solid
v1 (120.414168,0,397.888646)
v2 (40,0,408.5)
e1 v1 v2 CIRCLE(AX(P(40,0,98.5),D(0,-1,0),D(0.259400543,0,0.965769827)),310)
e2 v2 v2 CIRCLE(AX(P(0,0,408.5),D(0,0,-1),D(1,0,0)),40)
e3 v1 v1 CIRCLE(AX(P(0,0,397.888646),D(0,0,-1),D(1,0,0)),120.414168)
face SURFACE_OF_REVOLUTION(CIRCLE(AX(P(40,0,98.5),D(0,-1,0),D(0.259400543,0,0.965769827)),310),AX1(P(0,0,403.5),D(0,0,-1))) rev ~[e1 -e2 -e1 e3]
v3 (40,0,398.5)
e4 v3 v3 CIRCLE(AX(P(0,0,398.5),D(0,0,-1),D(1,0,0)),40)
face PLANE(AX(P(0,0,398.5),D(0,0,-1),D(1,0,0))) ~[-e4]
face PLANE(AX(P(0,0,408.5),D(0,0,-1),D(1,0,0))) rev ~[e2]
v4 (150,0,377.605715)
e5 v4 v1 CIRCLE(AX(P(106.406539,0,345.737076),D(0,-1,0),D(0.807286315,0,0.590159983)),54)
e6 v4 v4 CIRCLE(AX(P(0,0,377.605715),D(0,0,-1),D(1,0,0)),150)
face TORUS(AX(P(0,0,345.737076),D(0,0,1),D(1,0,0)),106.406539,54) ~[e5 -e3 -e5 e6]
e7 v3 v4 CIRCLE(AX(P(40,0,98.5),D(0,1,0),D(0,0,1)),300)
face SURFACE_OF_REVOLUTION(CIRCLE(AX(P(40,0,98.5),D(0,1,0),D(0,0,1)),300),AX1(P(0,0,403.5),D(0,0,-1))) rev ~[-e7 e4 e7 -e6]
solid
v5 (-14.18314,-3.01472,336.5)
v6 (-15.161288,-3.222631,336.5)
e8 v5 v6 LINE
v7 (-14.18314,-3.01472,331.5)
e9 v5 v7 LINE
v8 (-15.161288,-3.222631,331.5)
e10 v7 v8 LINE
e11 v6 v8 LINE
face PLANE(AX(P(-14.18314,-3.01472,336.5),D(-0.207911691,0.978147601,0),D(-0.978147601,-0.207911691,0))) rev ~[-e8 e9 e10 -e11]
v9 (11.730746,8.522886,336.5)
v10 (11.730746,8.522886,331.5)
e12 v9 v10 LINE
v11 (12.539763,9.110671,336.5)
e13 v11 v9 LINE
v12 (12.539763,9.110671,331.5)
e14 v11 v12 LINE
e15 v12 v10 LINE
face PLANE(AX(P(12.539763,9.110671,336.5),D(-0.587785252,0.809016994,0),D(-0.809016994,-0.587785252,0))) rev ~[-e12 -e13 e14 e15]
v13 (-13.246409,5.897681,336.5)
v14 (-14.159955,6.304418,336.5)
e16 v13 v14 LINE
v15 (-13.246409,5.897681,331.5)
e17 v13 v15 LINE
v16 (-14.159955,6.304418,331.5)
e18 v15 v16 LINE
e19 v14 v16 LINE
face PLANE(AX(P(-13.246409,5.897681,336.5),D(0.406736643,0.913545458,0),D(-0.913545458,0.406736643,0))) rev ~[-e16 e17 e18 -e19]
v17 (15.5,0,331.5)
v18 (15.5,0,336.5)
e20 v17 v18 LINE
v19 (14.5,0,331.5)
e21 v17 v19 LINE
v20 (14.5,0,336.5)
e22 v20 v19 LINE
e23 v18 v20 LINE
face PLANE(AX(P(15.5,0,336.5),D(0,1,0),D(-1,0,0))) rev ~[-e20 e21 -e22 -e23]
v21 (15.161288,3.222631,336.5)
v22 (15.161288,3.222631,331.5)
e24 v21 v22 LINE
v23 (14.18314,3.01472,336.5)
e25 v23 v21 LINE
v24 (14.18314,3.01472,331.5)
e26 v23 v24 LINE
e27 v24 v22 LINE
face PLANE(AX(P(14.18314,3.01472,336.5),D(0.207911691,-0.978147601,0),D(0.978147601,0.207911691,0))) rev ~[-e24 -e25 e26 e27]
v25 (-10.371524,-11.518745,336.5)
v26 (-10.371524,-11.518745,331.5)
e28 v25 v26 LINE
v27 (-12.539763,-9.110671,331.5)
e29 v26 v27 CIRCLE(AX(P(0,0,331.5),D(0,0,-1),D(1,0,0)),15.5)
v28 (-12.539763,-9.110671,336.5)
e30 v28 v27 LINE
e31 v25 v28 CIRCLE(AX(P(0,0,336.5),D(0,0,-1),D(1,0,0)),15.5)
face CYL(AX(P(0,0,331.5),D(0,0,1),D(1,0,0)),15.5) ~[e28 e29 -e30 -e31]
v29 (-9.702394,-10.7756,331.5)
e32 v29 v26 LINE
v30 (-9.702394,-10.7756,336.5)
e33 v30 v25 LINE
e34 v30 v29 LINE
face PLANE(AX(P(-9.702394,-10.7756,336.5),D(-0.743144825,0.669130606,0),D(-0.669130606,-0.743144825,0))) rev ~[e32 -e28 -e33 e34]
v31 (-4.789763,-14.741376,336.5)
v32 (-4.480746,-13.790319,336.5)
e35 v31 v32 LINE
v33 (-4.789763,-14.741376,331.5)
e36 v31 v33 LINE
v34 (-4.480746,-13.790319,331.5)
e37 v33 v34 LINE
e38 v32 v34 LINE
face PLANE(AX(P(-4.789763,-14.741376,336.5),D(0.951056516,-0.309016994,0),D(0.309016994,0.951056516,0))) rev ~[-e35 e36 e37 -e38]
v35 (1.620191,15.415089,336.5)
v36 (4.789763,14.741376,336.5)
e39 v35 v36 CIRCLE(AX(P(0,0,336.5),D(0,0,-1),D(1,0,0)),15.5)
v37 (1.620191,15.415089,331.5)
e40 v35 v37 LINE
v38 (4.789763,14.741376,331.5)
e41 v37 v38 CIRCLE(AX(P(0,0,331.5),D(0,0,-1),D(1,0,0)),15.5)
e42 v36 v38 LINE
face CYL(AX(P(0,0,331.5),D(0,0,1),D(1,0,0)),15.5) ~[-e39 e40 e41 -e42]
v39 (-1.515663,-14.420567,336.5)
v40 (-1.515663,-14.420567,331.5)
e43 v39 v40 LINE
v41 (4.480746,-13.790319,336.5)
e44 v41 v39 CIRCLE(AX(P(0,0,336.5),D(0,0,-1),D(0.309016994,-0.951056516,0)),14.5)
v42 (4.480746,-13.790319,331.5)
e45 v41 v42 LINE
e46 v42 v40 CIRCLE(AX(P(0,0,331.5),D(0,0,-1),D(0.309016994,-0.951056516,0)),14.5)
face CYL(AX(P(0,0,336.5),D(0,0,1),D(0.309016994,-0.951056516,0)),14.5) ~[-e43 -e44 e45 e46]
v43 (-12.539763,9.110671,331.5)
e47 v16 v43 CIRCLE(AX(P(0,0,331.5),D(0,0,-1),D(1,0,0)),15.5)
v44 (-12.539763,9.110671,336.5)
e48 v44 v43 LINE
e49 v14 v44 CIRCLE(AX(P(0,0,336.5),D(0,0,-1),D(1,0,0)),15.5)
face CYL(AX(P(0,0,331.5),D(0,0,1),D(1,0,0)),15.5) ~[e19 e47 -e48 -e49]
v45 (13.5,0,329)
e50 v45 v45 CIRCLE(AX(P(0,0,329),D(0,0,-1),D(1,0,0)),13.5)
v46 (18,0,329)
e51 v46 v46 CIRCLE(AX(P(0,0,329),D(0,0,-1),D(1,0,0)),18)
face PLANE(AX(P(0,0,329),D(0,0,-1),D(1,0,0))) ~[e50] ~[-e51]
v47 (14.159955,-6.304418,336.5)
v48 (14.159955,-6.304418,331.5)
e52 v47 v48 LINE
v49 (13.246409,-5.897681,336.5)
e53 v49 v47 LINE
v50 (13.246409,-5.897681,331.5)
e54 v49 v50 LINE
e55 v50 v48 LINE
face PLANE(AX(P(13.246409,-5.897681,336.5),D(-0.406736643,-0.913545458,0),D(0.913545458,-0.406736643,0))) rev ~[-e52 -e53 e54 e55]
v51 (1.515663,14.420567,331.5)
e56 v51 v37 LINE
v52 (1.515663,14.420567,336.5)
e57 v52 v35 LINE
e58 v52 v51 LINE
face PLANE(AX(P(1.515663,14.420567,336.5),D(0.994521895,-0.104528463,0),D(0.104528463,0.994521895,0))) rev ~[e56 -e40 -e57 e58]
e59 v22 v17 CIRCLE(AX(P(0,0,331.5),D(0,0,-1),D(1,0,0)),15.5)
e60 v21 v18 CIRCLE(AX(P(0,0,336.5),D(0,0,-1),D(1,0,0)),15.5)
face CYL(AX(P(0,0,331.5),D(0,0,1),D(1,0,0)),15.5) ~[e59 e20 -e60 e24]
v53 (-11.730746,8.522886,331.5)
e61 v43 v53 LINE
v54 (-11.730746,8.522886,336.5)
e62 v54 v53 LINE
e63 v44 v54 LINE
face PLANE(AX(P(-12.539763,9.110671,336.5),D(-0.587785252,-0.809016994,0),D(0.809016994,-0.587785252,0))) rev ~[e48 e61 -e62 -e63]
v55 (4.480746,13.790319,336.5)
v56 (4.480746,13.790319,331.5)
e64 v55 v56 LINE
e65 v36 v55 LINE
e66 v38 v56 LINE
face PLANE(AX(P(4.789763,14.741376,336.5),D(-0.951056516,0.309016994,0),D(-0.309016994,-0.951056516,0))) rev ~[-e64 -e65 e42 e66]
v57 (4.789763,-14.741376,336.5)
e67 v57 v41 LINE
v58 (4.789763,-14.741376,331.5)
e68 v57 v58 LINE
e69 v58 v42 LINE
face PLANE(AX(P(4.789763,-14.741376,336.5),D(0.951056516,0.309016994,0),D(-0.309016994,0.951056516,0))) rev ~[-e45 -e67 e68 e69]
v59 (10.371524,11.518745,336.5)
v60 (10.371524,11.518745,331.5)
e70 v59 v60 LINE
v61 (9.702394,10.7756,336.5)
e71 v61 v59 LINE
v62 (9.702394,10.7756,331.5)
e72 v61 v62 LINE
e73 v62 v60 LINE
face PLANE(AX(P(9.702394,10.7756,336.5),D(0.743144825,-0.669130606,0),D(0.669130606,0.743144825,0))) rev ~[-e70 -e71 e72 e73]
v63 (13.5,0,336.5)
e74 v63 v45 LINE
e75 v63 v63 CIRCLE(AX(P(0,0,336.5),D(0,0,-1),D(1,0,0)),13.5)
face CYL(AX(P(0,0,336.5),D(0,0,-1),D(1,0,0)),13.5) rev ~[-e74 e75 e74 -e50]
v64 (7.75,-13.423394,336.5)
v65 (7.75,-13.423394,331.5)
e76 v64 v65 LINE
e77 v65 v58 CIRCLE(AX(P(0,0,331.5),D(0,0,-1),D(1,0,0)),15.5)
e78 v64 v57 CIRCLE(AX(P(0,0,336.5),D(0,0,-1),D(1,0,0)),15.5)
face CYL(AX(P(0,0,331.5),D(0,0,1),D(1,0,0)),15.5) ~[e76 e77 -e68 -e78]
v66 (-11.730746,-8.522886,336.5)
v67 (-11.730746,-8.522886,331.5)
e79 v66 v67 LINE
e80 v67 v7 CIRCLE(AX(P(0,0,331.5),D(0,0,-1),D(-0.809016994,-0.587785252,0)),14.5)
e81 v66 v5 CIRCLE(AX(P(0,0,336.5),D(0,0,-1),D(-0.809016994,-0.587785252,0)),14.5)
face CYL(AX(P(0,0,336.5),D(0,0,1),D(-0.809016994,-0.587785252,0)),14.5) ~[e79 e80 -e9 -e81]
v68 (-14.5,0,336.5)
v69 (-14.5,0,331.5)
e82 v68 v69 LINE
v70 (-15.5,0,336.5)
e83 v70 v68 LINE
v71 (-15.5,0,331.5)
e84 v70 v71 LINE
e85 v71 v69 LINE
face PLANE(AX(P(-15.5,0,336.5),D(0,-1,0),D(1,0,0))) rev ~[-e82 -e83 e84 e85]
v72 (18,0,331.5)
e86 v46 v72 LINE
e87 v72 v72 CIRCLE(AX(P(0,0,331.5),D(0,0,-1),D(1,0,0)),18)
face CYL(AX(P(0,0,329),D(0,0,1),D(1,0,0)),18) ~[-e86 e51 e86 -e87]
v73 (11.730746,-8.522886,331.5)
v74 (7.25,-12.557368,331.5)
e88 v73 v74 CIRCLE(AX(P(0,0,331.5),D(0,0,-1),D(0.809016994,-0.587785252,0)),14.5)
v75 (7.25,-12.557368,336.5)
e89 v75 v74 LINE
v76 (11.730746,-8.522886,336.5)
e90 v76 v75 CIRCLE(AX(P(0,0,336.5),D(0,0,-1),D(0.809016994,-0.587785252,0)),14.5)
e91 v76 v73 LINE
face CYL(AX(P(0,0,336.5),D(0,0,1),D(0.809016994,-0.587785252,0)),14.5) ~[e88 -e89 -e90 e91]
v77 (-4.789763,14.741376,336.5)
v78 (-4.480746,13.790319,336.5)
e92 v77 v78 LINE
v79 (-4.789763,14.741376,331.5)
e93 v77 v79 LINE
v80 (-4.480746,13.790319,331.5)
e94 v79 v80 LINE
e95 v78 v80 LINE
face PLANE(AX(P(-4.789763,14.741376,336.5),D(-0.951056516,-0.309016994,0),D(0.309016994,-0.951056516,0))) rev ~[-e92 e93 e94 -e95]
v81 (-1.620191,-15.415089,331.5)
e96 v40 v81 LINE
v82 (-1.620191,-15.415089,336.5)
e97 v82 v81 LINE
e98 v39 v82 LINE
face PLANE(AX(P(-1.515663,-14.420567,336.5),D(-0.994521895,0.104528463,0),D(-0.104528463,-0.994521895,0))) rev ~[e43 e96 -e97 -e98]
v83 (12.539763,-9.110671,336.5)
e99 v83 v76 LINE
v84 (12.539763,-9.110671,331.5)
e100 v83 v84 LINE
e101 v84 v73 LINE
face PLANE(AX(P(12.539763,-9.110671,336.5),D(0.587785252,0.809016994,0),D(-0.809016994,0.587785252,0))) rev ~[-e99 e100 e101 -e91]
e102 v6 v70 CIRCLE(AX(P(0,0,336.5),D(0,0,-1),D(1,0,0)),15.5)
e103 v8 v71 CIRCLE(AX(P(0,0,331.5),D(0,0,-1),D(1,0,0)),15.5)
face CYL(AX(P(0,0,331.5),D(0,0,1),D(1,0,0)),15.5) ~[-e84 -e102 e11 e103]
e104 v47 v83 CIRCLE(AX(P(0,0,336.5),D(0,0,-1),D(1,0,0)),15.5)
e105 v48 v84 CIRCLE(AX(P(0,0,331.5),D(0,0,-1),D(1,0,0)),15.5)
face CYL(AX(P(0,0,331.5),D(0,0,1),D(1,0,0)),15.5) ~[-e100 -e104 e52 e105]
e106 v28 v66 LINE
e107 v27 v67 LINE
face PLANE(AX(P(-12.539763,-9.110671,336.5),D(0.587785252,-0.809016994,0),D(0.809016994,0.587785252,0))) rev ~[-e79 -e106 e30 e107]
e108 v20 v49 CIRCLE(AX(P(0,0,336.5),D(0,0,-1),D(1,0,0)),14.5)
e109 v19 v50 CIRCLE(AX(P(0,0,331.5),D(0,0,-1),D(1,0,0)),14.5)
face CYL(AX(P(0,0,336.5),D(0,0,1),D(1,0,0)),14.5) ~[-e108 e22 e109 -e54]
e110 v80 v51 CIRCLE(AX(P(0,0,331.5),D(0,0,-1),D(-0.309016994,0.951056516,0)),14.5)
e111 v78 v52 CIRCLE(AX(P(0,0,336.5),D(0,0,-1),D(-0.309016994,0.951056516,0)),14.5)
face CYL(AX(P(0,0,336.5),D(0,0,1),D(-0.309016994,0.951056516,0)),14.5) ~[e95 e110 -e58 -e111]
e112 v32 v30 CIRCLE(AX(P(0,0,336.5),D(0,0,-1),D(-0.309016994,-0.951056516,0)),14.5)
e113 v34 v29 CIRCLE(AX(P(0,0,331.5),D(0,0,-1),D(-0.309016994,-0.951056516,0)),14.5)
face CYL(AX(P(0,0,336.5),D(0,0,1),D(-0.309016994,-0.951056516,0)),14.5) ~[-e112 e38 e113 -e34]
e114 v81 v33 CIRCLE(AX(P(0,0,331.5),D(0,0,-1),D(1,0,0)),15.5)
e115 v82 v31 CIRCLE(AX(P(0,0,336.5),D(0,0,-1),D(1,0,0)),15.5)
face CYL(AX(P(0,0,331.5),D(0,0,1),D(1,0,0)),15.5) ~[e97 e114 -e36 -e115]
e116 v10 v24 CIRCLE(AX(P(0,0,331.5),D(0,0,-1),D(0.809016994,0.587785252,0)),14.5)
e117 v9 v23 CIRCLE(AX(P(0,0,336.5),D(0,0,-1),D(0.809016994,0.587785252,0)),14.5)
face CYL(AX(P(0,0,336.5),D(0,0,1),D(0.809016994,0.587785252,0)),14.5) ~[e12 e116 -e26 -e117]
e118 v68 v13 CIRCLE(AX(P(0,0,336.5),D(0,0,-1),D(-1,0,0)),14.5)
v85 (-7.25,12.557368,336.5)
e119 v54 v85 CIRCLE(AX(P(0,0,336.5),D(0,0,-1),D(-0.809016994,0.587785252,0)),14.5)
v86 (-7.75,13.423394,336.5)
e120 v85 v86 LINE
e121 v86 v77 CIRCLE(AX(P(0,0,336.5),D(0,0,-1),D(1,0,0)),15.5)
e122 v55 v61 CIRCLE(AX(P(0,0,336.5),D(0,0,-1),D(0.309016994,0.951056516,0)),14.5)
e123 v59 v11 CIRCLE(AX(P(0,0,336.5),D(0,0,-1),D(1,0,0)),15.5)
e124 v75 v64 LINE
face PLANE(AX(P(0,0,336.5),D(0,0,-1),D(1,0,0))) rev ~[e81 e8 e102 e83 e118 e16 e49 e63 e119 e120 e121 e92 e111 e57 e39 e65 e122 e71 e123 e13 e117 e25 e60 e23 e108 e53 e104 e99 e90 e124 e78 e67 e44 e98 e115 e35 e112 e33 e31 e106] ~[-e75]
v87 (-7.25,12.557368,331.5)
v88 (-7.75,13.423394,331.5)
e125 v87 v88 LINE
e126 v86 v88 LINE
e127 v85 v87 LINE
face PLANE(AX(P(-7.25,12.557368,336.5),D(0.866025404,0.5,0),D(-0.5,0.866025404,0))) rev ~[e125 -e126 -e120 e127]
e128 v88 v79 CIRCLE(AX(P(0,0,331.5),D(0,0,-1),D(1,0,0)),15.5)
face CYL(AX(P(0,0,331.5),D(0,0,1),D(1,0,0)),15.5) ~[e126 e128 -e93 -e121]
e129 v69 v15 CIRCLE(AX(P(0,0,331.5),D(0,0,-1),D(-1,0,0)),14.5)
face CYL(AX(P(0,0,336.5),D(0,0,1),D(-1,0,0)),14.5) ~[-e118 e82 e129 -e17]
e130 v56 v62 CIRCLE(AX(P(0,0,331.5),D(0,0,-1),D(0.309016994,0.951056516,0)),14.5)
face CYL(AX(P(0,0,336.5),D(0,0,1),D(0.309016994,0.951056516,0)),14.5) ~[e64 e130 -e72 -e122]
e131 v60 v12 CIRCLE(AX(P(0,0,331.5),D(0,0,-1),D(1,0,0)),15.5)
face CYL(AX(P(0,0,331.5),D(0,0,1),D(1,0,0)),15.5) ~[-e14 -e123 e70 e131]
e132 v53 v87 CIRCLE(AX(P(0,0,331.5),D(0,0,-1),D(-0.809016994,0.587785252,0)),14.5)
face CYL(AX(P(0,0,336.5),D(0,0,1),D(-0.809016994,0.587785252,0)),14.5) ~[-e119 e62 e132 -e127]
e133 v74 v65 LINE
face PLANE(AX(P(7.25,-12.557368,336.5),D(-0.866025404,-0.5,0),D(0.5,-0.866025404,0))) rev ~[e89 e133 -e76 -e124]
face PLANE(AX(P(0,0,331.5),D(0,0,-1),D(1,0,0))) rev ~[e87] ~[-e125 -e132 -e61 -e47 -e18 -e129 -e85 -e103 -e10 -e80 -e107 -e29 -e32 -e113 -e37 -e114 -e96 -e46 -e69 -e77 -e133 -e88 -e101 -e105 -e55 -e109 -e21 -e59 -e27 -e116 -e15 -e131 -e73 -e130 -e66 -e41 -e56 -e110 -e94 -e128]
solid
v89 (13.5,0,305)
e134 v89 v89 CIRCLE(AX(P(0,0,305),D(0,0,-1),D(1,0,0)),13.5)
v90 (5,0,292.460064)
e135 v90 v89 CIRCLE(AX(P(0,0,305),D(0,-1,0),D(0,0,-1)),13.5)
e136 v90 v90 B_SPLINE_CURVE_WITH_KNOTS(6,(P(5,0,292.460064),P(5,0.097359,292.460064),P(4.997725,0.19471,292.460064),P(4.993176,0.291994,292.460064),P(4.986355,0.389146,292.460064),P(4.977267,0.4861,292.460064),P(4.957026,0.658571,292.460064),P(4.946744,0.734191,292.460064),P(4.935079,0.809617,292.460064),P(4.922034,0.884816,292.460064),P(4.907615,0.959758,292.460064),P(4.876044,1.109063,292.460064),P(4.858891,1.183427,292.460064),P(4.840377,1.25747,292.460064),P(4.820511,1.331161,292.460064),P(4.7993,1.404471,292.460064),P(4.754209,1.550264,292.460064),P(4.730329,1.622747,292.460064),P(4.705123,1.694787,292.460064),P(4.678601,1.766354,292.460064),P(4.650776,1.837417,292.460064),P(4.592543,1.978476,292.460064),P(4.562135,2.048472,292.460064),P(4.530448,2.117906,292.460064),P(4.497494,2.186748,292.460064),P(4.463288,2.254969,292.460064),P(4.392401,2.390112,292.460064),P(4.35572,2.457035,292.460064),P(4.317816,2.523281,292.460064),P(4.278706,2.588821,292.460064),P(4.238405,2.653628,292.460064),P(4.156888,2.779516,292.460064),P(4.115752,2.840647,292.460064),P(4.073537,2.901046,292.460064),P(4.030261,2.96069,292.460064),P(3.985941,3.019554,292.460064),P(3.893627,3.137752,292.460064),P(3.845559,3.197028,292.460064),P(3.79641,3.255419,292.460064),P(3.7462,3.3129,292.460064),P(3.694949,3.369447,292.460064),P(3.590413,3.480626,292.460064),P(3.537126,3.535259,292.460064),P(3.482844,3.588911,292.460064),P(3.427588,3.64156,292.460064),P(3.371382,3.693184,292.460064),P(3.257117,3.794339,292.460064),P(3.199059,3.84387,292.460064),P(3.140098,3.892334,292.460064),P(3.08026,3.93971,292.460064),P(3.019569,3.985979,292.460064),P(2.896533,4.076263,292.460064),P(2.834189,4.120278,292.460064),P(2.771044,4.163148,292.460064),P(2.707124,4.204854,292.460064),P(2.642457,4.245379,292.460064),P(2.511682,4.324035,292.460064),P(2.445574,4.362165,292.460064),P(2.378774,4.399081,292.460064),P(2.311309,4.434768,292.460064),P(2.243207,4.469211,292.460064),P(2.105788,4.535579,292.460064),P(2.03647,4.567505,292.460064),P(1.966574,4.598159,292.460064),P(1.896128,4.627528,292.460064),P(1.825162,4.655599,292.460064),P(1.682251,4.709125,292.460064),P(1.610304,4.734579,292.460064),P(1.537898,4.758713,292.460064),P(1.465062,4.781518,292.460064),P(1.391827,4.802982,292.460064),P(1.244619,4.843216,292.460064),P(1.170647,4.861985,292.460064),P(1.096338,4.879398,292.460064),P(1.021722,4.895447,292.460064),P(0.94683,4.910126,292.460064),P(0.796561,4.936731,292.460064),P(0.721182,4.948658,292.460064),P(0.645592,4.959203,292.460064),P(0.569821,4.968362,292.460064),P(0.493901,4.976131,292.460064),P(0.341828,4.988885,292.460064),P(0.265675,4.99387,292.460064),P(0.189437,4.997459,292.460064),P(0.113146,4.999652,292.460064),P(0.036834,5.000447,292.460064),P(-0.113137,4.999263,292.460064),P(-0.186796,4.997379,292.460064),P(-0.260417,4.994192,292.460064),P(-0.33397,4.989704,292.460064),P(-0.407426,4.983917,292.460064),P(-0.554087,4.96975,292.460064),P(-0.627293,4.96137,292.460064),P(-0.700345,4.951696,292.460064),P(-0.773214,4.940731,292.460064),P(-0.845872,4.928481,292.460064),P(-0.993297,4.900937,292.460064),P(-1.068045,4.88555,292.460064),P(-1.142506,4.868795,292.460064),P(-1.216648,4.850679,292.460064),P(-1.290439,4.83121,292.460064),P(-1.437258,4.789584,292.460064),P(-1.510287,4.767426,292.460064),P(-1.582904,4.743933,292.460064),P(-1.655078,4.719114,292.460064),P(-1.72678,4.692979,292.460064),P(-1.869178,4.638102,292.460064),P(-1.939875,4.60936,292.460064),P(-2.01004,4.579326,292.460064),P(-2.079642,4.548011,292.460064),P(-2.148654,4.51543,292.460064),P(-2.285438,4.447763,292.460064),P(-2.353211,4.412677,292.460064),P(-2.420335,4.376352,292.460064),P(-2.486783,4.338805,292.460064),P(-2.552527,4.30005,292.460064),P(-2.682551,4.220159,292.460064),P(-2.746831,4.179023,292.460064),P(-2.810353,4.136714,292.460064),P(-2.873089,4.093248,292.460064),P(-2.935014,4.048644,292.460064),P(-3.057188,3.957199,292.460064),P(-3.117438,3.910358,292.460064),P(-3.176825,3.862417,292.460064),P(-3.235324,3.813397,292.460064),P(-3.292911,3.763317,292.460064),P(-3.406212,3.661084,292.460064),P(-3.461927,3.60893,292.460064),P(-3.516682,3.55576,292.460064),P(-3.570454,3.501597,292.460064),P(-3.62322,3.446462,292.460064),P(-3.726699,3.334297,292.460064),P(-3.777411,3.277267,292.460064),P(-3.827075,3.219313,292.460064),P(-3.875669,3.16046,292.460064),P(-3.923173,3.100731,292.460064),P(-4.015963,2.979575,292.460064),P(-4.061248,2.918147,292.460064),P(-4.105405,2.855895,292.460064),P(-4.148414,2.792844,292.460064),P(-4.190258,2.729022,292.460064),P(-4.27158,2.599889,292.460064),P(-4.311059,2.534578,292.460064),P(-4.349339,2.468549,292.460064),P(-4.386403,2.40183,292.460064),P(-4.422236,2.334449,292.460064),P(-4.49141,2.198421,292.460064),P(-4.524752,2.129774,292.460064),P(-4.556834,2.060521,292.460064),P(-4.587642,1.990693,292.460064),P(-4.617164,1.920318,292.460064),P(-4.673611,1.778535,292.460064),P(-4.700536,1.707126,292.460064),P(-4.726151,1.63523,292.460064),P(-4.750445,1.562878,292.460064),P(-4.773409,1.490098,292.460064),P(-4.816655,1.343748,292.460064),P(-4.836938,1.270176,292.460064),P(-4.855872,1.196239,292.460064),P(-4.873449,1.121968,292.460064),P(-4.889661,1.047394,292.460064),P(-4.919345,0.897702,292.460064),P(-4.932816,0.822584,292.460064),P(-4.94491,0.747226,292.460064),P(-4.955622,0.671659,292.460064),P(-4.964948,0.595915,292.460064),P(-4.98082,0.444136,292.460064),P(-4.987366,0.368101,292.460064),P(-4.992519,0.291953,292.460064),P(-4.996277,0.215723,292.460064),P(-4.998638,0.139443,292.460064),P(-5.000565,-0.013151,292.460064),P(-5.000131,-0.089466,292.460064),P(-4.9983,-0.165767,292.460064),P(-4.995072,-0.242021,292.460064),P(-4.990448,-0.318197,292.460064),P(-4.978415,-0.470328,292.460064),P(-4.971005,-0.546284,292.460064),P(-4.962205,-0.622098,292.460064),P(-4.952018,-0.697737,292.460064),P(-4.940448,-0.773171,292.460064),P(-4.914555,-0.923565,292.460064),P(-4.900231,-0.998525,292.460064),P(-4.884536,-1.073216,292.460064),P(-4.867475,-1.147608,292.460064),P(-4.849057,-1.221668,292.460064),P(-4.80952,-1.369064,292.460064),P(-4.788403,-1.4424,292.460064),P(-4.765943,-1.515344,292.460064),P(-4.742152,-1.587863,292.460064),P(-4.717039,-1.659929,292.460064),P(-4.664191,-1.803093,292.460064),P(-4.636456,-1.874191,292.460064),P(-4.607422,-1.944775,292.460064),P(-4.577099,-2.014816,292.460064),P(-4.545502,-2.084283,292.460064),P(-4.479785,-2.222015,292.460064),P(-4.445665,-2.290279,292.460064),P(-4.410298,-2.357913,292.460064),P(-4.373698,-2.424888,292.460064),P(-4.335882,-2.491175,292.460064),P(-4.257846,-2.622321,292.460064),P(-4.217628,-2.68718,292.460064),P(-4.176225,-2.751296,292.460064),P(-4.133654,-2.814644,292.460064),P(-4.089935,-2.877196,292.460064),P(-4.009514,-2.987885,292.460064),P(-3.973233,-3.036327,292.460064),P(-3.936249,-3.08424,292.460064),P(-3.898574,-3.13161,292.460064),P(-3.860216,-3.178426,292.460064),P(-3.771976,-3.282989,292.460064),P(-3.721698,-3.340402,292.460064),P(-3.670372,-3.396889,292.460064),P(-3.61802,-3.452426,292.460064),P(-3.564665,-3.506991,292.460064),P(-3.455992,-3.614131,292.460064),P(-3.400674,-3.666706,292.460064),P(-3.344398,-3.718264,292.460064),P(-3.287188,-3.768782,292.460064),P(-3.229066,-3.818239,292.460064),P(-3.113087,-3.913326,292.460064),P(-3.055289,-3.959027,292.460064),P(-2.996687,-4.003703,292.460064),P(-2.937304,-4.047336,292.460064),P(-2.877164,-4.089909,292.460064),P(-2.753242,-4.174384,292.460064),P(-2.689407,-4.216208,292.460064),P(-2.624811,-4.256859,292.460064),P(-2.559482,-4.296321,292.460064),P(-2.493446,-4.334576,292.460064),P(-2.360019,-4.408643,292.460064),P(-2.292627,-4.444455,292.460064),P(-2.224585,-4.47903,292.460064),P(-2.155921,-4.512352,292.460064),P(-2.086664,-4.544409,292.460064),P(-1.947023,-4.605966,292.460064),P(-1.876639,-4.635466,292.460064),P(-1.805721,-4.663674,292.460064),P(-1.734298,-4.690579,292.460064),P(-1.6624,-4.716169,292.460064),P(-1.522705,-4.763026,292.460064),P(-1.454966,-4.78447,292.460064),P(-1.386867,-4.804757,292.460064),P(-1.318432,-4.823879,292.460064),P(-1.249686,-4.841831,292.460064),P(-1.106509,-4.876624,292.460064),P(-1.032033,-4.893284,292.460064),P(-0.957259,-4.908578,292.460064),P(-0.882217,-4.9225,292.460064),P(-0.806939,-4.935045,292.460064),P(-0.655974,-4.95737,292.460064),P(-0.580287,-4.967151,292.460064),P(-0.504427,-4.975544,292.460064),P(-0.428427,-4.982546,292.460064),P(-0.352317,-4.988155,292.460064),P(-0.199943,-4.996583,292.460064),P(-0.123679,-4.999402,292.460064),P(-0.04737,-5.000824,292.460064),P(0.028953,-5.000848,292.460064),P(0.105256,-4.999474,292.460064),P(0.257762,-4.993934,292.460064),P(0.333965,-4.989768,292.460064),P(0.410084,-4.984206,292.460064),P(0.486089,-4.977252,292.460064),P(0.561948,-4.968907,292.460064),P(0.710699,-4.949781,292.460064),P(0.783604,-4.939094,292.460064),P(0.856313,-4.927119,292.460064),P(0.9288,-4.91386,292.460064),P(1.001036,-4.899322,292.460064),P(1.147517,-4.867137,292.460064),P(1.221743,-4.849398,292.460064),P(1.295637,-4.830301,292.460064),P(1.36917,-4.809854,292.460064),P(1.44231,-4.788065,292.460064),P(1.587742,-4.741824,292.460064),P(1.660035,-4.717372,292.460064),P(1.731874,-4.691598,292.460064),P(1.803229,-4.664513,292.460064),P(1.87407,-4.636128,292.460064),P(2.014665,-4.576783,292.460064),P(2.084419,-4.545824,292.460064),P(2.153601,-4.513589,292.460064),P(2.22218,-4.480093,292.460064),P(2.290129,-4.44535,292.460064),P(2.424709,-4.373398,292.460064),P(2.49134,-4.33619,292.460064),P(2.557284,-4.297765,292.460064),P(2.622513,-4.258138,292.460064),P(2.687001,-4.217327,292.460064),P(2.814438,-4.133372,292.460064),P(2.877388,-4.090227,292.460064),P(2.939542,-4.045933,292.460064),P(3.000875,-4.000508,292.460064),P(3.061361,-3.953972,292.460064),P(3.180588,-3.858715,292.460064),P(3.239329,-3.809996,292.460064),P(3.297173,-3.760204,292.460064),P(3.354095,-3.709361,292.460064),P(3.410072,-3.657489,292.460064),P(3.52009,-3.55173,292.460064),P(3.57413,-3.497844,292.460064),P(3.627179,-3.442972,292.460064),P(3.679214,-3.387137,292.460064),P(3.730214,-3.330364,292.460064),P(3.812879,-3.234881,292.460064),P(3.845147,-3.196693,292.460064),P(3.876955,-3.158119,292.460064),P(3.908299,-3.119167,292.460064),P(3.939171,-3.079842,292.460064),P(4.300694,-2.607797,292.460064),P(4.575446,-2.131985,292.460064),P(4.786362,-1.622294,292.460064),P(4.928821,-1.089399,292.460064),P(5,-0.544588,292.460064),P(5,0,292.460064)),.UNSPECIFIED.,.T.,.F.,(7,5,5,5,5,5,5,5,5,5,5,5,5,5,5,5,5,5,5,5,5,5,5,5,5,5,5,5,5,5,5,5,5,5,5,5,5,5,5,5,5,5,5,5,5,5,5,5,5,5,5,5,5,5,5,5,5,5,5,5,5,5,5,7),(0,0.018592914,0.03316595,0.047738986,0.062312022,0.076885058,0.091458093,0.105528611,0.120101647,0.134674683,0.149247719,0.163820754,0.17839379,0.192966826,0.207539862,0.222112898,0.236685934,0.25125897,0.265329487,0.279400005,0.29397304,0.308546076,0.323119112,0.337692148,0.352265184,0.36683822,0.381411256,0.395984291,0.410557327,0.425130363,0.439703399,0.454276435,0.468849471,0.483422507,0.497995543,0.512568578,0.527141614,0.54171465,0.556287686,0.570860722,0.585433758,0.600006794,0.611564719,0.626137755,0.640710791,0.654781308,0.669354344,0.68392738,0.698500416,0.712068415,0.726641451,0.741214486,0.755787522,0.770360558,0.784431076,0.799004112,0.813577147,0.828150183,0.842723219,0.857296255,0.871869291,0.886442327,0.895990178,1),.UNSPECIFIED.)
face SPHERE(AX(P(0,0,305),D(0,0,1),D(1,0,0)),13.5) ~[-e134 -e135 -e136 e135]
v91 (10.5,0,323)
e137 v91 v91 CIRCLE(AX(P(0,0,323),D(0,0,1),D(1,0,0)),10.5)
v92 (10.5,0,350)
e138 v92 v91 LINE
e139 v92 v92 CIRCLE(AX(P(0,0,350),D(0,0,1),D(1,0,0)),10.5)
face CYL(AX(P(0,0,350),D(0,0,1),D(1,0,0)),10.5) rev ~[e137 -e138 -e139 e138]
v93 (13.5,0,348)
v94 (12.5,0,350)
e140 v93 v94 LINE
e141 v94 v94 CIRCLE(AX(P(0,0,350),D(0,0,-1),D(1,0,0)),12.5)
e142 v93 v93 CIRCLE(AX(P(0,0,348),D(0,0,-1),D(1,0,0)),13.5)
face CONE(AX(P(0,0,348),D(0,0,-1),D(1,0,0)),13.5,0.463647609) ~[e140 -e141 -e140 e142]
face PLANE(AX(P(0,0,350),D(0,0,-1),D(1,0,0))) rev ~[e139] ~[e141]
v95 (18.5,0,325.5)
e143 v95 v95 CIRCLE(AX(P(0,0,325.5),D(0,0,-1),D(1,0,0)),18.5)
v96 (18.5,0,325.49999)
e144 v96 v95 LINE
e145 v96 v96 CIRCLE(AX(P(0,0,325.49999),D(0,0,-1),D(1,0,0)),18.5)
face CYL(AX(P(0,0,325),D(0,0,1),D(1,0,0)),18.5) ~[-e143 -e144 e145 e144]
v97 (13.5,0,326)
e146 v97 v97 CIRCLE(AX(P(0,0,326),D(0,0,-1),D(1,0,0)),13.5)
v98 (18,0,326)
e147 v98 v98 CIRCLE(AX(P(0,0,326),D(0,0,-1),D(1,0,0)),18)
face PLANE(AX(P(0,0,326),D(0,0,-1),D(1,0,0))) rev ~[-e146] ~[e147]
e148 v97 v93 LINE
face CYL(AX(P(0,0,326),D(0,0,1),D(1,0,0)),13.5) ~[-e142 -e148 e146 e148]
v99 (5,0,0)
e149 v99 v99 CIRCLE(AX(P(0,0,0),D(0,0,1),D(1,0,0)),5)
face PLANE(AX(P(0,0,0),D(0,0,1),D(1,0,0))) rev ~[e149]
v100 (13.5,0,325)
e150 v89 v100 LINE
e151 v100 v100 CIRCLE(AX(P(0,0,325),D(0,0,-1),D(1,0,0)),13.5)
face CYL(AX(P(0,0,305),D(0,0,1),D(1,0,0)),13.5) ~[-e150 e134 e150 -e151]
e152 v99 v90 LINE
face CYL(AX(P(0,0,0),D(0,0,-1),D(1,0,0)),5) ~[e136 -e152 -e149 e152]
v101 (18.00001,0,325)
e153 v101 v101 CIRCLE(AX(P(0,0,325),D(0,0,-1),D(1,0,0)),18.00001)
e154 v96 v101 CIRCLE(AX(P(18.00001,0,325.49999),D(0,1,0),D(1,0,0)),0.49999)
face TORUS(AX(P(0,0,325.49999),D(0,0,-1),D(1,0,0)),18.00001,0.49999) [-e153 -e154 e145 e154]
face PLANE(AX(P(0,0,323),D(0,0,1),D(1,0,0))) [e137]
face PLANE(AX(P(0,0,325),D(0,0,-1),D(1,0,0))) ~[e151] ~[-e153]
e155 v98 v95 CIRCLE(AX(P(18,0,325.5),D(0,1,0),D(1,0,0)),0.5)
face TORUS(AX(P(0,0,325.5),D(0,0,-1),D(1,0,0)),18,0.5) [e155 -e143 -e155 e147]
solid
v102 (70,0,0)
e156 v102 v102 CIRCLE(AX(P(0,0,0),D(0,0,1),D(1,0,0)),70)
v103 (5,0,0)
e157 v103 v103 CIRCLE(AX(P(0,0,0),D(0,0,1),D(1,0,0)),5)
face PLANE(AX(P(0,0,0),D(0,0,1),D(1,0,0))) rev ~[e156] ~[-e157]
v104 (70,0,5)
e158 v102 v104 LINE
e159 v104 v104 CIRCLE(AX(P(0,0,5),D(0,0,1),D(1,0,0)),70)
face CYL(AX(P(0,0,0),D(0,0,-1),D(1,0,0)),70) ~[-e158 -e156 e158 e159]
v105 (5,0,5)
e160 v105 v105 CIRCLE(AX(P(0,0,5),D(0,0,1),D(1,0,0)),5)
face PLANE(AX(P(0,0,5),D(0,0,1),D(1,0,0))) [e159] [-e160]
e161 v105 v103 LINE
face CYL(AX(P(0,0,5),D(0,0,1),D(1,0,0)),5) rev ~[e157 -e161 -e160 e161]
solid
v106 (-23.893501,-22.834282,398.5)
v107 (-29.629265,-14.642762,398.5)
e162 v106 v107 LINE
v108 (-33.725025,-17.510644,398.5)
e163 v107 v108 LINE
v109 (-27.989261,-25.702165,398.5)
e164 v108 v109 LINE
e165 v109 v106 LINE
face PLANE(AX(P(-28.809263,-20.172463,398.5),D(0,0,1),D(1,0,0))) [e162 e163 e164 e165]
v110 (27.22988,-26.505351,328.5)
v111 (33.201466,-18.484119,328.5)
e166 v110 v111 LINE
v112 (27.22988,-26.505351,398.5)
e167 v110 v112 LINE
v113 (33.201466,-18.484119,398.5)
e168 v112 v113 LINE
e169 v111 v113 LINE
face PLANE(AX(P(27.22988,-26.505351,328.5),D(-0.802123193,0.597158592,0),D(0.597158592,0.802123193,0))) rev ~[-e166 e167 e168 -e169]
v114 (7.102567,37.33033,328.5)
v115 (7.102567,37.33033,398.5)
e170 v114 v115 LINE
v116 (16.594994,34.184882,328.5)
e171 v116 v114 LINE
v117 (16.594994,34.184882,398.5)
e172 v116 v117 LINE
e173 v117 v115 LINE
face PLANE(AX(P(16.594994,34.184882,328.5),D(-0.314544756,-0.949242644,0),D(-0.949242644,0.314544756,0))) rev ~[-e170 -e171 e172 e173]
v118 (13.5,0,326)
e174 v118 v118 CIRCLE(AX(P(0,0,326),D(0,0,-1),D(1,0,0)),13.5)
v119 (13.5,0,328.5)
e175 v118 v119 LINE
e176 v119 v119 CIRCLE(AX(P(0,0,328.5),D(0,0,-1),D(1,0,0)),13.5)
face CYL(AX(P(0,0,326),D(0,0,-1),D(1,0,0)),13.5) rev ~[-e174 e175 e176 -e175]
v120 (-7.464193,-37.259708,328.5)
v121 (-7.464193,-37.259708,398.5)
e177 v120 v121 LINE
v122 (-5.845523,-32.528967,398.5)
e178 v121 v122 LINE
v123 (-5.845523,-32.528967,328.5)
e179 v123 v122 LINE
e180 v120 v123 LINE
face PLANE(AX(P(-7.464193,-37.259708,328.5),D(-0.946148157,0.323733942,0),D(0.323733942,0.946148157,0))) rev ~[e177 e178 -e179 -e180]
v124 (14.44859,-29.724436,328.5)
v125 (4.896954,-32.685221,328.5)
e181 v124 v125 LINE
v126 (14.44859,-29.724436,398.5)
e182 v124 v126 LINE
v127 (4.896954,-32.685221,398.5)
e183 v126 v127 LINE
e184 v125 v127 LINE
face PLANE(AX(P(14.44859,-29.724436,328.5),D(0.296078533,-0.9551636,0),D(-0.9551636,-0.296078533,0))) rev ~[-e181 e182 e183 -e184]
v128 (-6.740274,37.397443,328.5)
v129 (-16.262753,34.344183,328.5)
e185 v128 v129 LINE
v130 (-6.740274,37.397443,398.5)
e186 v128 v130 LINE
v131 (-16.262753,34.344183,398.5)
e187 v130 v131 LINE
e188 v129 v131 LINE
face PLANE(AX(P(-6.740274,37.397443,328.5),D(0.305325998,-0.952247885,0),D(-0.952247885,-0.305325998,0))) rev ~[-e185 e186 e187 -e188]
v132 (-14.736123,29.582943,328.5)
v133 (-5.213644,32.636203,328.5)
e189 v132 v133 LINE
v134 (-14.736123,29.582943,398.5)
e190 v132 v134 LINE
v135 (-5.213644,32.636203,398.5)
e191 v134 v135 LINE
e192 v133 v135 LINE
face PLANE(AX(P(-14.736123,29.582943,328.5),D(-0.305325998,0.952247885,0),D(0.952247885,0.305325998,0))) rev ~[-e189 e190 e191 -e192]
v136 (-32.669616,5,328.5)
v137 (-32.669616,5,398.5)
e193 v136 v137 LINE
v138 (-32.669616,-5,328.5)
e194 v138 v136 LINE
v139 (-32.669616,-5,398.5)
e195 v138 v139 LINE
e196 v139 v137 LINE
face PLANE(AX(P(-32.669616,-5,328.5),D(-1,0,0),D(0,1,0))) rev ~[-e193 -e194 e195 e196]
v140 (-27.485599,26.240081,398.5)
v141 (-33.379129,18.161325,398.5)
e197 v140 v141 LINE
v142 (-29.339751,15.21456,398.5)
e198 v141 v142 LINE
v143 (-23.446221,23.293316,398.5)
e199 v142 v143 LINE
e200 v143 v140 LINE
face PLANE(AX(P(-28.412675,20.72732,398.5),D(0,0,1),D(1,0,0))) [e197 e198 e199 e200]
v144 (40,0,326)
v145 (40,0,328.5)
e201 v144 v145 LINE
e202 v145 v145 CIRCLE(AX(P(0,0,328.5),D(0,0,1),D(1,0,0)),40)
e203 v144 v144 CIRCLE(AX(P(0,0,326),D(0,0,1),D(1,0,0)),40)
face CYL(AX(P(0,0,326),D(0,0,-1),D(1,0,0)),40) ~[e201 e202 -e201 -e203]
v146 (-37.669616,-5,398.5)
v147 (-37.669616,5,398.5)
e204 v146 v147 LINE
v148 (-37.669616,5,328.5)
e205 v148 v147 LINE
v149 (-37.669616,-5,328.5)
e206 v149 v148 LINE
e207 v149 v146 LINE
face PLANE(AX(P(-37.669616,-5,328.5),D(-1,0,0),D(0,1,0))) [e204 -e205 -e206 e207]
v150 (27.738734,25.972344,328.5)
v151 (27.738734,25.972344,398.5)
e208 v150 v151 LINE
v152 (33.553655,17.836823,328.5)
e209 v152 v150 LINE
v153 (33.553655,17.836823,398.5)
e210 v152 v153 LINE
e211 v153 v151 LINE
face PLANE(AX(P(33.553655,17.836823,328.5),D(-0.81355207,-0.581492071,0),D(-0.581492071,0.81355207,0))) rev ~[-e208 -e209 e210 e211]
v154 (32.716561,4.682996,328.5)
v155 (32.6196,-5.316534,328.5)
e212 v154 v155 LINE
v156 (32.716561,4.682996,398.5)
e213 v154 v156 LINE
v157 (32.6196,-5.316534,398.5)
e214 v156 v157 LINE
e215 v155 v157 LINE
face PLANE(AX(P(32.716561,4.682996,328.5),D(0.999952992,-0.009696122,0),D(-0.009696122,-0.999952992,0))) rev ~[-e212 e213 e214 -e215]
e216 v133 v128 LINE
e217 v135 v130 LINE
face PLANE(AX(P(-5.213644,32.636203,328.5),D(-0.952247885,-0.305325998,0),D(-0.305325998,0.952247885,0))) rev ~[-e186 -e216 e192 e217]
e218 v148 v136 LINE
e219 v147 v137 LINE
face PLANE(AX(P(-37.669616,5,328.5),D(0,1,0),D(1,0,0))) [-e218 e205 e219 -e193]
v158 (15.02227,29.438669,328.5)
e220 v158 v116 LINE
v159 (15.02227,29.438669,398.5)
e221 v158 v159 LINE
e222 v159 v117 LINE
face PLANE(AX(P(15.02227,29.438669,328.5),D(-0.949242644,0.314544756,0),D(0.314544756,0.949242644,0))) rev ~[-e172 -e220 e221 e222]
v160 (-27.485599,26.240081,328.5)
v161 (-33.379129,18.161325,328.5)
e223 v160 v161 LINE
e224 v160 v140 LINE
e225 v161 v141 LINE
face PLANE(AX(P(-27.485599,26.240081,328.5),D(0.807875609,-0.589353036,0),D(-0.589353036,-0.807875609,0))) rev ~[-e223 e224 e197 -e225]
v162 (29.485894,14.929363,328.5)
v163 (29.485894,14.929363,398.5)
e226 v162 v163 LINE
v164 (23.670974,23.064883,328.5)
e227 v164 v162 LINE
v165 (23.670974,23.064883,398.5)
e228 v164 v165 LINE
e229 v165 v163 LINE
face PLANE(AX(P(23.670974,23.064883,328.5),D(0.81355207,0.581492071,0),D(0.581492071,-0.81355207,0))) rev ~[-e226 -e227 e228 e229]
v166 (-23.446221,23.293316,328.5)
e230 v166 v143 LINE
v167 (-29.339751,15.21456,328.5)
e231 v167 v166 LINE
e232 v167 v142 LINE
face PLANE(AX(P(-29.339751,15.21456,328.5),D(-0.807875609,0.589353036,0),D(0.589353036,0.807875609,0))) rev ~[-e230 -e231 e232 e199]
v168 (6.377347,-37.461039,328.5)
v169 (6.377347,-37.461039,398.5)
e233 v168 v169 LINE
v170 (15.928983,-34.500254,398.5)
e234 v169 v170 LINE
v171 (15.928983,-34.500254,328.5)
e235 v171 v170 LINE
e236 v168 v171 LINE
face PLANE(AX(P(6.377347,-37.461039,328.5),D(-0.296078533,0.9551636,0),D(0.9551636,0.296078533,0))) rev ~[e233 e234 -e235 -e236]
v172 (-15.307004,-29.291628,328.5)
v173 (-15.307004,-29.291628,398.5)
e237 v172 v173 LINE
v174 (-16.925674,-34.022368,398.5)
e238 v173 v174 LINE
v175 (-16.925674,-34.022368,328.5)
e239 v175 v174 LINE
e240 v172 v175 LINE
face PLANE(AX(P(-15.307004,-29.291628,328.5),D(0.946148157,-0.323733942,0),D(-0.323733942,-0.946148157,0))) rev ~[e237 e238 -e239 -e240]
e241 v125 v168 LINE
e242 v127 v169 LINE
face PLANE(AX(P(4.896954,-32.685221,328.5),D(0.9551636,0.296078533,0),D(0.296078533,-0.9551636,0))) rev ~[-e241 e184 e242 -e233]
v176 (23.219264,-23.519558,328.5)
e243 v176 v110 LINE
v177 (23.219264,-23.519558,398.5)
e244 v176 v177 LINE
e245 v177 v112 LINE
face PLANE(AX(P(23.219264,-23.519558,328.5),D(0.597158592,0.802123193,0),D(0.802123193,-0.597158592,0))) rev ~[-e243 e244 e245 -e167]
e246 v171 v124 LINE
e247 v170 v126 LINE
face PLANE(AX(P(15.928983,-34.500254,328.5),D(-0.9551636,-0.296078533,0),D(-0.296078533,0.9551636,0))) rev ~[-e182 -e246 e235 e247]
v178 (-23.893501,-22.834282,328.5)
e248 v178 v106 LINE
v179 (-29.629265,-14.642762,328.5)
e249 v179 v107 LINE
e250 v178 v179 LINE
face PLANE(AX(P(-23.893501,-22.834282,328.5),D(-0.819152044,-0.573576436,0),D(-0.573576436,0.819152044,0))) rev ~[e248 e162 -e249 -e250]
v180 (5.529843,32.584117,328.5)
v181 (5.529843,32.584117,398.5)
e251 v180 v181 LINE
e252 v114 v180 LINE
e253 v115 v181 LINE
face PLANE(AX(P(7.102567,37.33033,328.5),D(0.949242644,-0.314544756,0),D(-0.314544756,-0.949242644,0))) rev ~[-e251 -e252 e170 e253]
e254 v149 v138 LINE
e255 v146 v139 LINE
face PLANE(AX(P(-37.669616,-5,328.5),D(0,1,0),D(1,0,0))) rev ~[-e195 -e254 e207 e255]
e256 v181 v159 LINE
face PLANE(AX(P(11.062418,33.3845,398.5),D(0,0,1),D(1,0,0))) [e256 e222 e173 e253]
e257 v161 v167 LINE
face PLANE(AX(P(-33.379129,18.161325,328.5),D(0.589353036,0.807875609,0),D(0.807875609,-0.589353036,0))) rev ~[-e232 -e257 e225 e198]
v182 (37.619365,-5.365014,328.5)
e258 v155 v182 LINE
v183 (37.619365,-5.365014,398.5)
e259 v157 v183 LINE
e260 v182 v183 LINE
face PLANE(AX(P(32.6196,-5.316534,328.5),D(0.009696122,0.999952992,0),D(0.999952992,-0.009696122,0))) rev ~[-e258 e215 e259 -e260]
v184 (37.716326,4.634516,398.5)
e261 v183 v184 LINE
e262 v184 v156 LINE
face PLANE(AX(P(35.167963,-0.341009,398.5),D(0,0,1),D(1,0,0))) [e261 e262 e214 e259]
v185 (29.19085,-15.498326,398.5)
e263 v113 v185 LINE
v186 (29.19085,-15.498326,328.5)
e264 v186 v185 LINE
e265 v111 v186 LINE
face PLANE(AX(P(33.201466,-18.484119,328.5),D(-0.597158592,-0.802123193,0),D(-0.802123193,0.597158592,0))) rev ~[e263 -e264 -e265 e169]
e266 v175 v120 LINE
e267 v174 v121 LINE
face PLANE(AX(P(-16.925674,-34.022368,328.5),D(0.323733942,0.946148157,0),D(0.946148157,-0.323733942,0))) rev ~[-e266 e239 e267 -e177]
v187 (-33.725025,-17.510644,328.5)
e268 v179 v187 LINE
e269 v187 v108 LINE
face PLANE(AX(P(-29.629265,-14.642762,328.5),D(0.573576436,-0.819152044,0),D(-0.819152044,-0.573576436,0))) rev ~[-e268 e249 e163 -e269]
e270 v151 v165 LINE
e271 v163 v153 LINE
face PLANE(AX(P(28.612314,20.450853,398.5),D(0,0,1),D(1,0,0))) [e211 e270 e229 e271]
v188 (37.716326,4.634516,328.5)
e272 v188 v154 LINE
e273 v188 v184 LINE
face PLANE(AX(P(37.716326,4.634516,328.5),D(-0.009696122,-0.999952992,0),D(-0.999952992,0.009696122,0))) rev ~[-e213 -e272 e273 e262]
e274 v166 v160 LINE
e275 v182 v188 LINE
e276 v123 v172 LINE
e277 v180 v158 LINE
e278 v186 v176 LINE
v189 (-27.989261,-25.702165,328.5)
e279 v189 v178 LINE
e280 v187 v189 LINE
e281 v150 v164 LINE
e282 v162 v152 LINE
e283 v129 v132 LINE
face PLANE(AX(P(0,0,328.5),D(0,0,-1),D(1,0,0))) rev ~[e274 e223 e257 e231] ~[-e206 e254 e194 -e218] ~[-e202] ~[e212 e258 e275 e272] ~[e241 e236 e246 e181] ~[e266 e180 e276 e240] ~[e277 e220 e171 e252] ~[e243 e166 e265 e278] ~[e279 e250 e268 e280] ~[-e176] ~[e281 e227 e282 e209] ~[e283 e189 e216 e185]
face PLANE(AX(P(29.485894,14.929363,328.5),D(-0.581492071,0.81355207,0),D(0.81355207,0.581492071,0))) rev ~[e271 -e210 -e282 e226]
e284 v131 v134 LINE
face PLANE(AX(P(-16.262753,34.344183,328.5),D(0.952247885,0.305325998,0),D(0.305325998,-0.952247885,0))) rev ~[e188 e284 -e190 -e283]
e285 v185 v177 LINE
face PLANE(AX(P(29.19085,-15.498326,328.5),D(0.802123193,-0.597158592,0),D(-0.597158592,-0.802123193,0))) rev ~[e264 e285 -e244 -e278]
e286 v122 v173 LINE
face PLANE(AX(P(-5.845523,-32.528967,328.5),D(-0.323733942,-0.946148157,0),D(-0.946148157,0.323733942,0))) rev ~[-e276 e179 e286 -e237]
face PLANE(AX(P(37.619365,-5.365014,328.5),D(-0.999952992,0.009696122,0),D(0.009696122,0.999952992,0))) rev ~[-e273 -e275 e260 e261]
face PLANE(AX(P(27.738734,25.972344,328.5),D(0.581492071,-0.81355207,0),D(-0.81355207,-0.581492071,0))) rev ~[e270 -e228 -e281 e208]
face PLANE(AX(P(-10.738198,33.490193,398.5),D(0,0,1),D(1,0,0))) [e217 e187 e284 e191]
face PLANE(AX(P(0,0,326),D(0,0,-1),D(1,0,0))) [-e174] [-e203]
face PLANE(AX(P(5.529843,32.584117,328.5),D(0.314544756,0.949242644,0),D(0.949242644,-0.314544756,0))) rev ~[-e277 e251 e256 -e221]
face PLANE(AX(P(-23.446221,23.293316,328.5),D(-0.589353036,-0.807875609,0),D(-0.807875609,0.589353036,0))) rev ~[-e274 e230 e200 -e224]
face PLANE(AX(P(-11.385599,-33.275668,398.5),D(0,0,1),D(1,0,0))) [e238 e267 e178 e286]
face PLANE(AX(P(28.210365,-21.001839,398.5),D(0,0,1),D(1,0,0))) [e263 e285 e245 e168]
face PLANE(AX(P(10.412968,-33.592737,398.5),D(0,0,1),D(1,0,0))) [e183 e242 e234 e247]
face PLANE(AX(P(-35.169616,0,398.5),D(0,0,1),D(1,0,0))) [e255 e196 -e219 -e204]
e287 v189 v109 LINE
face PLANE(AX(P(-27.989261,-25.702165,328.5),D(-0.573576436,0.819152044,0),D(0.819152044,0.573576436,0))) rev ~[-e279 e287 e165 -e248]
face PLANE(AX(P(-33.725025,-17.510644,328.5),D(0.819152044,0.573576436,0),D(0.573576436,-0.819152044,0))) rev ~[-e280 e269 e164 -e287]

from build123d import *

# Parameters (mm, degrees)
F0_R      = 70
F1_DEPTH  = 5
F2_R      = 5
F3_DEPTH  = 5
F4_R      = 5
F5_DEPTH  = 350
F8_R      = 0.5
F9_R      = 0.49999
F11_R     = 10.5
F12_DEPTH = 27
F16_DEPTH = 5
F17_R     = 40
F17_R_2   = 18
F18_DEPTH = 2.5
F19_W     = 5
F19_H     = 10
F20_DEPTH = 70
F23_DEPTH = 2.5


# Not quite as in the source:
# - a fillet or chamfer that OpenCascade refuses, or shapes differently, is made with other operations: its cross-section is extruded or revolved along the edge and cut away or added
# - a fillet or chamfer is up to 0.001 mm smaller than in the source, because OpenCascade refuses the exact size


with BuildPart() as f1:
    # F0 (on Top) → F1 (new body)
    with BuildSketch(Plane.XY):
        Circle(F0_R)
    extrude(amount=F1_DEPTH)

    # F2 (on face) → F3 (cut, through all)
    with BuildSketch(Plane.XY.offset(5)):
        Circle(F2_R)
    extrude(amount=-F3_DEPTH, mode=Mode.SUBTRACT)


with BuildPart() as f5:
    # F4 (on Top) → F5 (new body)
    with BuildSketch(Plane.XY):
        Circle(F4_R)
    extrude(amount=F5_DEPTH)

    # F6 (on Front) → F7 (revolve)
    with BuildSketch(Plane.XZ):
        with BuildLine():
            Line((13.5, 350), (0, 350))
            Line((0, 350), (0, 291.5))
            ThreePointArc((0, 291.5), (9.545941546, 295.454058454), (13.5, 305))
            Line((13.5, 305), (13.5, 325))
            Line((13.5, 325), (18.5, 325))
            Line((18.5, 325), (18.5, 326))
            Line((18.5, 326), (13.5, 326))
            Line((13.5, 326), (13.5, 330.6318867207))
            Line((13.5, 330.6318867207), (13.5, 350))
        make_face()
    revolve(axis=Axis((0, 0, 320.75), (0, 0, -1)))

    # F8
    f8_edges = [f5.edges().sort_by_distance(p)[0] for p in [
        (-18.5, 0, 326),
    ]]
    fillet(f8_edges, radius=F8_R)

    # F9 (radius 0.5 in the source; OpenCascade refuses exactly that, so slightly less here)
    f9_edges = [f5.edges().sort_by_distance(p)[0] for p in [
        (-18.5, 0, 325),
    ]]
    fillet(f9_edges, radius=F9_R)

    # F10: chamfer of 1 x 2 on 1 edges, made by hand

    # F10_s1 → F10_t2 (revolve, cut)
    with BuildSketch(Plane.XZ):
        Polygon((13.5, 348), (12.5, 350), (13.5, 350), align=None)
    revolve(axis=Axis((0, 0, 350), (0, 0, -1)), mode=Mode.SUBTRACT)

    # F11 (on face) → F12 (cut)
    with BuildSketch(Plane.XY.offset(350)):
        Circle(F11_R)
    extrude(amount=-F12_DEPTH, mode=Mode.SUBTRACT)


with BuildPart() as f14:
    # F13 (on Front) → F14 (revolve)
    with BuildSketch(Plane.XZ):
        Polygon((13.5, 329), (18, 329), (18, 331.5), (15.5, 331.5), (15.5, 336.5), (13.5, 336.5), align=None)
    revolve(axis=Axis((0, 0, 328.6638983499), (0, 0, -1)))

    # F15 (on face) → F16 (cut)
    with BuildSketch(Plane.XY.offset(336.5)):
        with BuildLine():
            ThreePointArc((-14.1599545935, 6.3044179677), (-15.1612878114, 3.2226312077), (-15.5, 0))
            Line((-15.5, 0), (-14.5, 0))
            ThreePointArc((-14.5, 0), (-14.1831402106, 3.0147195169), (-13.2464091358, 5.8976813246))
            Line((-13.2464091358, 5.8976813246), (-14.1599545935, 6.3044179677))
        make_face()
        with BuildLine():
            ThreePointArc((-7.75, 13.4233937587), (-10.3715243986, 11.5187447949), (-12.5397634128, 9.1106714105))
            Line((-12.5397634128, 9.1106714105), (-11.7307464184, 8.5228861582))
            ThreePointArc((-11.7307464184, 8.5228861582), (-9.7023937922, 10.7755999694), (-7.25, 12.5573683549))
            Line((-7.25, 12.5573683549), (-7.75, 13.4233937587))
        make_face()
        with BuildLine():
            ThreePointArc((1.6201911806, 15.4150893782), (-1.6201911806, 15.4150893782), (-4.7897634128, 14.7413760026))
            Line((-4.7897634128, 14.7413760026), (-4.4807464184, 13.7903194863))
            ThreePointArc((-4.4807464184, 13.7903194863), (-1.5156627174, 14.4205674828), (1.5156627174, 14.4205674828))
            Line((1.5156627174, 14.4205674828), (1.6201911806, 15.4150893782))
        make_face()
        with BuildLine():
            ThreePointArc((4.4807464184, 13.7903194863), (7.25, 12.5573683549), (9.7023937922, 10.7755999694))
            Line((9.7023937922, 10.7755999694), (10.3715243986, 11.5187447949))
            ThreePointArc((10.3715243986, 11.5187447949), (7.75, 13.4233937587), (4.7897634128, 14.7413760026))
            Line((4.7897634128, 14.7413760026), (4.4807464184, 13.7903194863))
        make_face()
        with BuildLine():
            ThreePointArc((11.7307464184, 8.5228861582), (13.2464091358, 5.8976813246), (14.1831402106, 3.0147195169))
            Line((14.1831402106, 3.0147195169), (15.1612878114, 3.2226312077))
            ThreePointArc((15.1612878114, 3.2226312077), (14.1599545935, 6.3044179677), (12.5397634128, 9.1106714105))
            Line((12.5397634128, 9.1106714105), (11.7307464184, 8.5228861582))
        make_face()
        with BuildLine():
            ThreePointArc((14.5, 0), (14.1831402106, -3.0147195169), (13.2464091358, -5.8976813246))
            Line((13.2464091358, -5.8976813246), (14.1599545935, -6.3044179677))
            ThreePointArc((14.1599545935, -6.3044179677), (15.1612878114, -3.2226312077), (15.5, 0))
            Line((15.5, 0), (14.5, 0))
        make_face()
        with BuildLine():
            ThreePointArc((11.7307464184, -8.5228861582), (9.7023937922, -10.7755999694), (7.25, -12.5573683549))
            Line((7.25, -12.5573683549), (7.75, -13.4233937587))
            ThreePointArc((7.75, -13.4233937587), (10.3715243986, -11.5187447949), (12.5397634128, -9.1106714105))
            Line((12.5397634128, -9.1106714105), (11.7307464184, -8.5228861582))
        make_face()
        with BuildLine():
            ThreePointArc((4.4807464184, -13.7903194863), (1.5156627174, -14.4205674828), (-1.5156627174, -14.4205674828))
            Line((-1.5156627174, -14.4205674828), (-1.6201911806, -15.4150893782))
            ThreePointArc((-1.6201911806, -15.4150893782), (1.6201911806, -15.4150893782), (4.7897634128, -14.7413760026))
            Line((4.7897634128, -14.7413760026), (4.4807464184, -13.7903194863))
        make_face()
        with BuildLine():
            Line((-9.7023937922, -10.7755999694), (-10.3715243986, -11.5187447949))
            ThreePointArc((-10.3715243986, -11.5187447949), (-7.75, -13.4233937587), (-4.7897634128, -14.7413760026))
            Line((-4.7897634128, -14.7413760026), (-4.4807464184, -13.7903194863))
            ThreePointArc((-4.4807464184, -13.7903194863), (-7.25, -12.5573683549), (-9.7023937922, -10.7755999694))
        make_face()
        with BuildLine():
            Line((-14.1831402106, -3.0147195169), (-15.1612878114, -3.2226312077))
            ThreePointArc((-15.1612878114, -3.2226312077), (-14.1599545935, -6.3044179677), (-12.5397634128, -9.1106714105))
            Line((-12.5397634128, -9.1106714105), (-11.7307464184, -8.5228861582))
            ThreePointArc((-11.7307464184, -8.5228861582), (-13.2464091358, -5.8976813246), (-14.1831402106, -3.0147195169))
        make_face()
    extrude(amount=-F16_DEPTH, mode=Mode.SUBTRACT)


with BuildPart() as f18:
    # F17 (on face) → F18 (new body)
    with BuildSketch(Plane.XY.offset(326)):
        Circle(F17_R)
        Circle(F17_R_2, mode=Mode.SUBTRACT)
    extrude(amount=F18_DEPTH)

    # F19 (on face) → F20 (join)
    with BuildSketch(Plane.XY.offset(328.5)):
        Polygon((-23.8935008815, -22.8342823752), (-29.629265245, -14.6427619323), (-33.7250254664, -17.5106441141), (-27.9892611029, -25.702164557), align=None)
        with Locations((-35.1696164037, 0)):
            Rectangle(F19_W, F19_H)
        Polygon((-29.3397514128, 15.2145595729), (-23.4462210519, 23.2933156581), (-27.4855990945, 26.2400808386), (-33.3791294554, 18.1613247534), align=None)
        Polygon((-14.7361226495, 29.5829431467), (-5.2136437961, 32.6362031237), (-6.7402737846, 37.3974425504), (-16.2627526379, 34.3441825734), align=None)
        Polygon((5.5298433074, 32.5841168203), (15.0222697431, 29.4386692588), (16.5949935239, 34.1848824766), (7.1025670882, 37.3303300382), align=None)
        Polygon((23.6709737035, 23.0648832621), (29.4858944163, 14.9293625594), (33.5536547677, 17.8368229159), (27.7387340548, 25.9723436185), align=None)
        Polygon((32.7165612627, 4.6829963815), (32.6196000458, -5.3165335336), (37.6193650034, -5.3650141421), (37.7163262202, 4.634515773), align=None)
        Polygon((29.1908499743, -15.4983261593), (23.2192640573, -23.5195580869), (27.2298800211, -26.5053510454), (33.2014659381, -18.4841191178), align=None)
        Polygon((14.44859011, -29.7244357356), (4.8969541137, -32.6852210696), (6.3773467807, -37.4610390678), (15.928982777, -34.5002537337), align=None)
        Polygon((-5.8455229195, -32.5289670565), (-15.3070044883, -29.2916276359), (-16.9256741986, -34.0223684203), (-7.4641926298, -37.2597078408), align=None)
    extrude(amount=F20_DEPTH)

    # F23 (add): a face of the model
    f23_faces = [f5.part.faces().sort_by_distance(p)[0] for p in [
        (-17.4908831175, 0, 326),
    ]]
    extrude(f23_faces, amount=F23_DEPTH)


with BuildPart() as f22:
    # F21 (on Front) → F22 (revolve)
    with BuildSketch(Plane.XZ):
        with BuildLine():
            Line((0, 408.5), (0, 398.5))
            Line((0, 398.5), (40, 398.5))
            ThreePointArc((40, 398.5), (95.9834153044, 393.2301430306), (150, 377.6057147391))
            ThreePointArc((150, 377.6057147391), (136.9404665109, 390.2755901139), (120.4141683044, 397.8886463043))
            ThreePointArc((120.4141683044, 397.8886463043), (80.5556386072, 405.8357124988), (40, 408.5))
            Line((40, 408.5), (0, 408.5))
        make_face()
    revolve(axis=Axis((0, 0, 403.5), (0, 0, -1)))


solid = Compound([f1.part, f5.part, f14.part, f18.part, f22.part])
